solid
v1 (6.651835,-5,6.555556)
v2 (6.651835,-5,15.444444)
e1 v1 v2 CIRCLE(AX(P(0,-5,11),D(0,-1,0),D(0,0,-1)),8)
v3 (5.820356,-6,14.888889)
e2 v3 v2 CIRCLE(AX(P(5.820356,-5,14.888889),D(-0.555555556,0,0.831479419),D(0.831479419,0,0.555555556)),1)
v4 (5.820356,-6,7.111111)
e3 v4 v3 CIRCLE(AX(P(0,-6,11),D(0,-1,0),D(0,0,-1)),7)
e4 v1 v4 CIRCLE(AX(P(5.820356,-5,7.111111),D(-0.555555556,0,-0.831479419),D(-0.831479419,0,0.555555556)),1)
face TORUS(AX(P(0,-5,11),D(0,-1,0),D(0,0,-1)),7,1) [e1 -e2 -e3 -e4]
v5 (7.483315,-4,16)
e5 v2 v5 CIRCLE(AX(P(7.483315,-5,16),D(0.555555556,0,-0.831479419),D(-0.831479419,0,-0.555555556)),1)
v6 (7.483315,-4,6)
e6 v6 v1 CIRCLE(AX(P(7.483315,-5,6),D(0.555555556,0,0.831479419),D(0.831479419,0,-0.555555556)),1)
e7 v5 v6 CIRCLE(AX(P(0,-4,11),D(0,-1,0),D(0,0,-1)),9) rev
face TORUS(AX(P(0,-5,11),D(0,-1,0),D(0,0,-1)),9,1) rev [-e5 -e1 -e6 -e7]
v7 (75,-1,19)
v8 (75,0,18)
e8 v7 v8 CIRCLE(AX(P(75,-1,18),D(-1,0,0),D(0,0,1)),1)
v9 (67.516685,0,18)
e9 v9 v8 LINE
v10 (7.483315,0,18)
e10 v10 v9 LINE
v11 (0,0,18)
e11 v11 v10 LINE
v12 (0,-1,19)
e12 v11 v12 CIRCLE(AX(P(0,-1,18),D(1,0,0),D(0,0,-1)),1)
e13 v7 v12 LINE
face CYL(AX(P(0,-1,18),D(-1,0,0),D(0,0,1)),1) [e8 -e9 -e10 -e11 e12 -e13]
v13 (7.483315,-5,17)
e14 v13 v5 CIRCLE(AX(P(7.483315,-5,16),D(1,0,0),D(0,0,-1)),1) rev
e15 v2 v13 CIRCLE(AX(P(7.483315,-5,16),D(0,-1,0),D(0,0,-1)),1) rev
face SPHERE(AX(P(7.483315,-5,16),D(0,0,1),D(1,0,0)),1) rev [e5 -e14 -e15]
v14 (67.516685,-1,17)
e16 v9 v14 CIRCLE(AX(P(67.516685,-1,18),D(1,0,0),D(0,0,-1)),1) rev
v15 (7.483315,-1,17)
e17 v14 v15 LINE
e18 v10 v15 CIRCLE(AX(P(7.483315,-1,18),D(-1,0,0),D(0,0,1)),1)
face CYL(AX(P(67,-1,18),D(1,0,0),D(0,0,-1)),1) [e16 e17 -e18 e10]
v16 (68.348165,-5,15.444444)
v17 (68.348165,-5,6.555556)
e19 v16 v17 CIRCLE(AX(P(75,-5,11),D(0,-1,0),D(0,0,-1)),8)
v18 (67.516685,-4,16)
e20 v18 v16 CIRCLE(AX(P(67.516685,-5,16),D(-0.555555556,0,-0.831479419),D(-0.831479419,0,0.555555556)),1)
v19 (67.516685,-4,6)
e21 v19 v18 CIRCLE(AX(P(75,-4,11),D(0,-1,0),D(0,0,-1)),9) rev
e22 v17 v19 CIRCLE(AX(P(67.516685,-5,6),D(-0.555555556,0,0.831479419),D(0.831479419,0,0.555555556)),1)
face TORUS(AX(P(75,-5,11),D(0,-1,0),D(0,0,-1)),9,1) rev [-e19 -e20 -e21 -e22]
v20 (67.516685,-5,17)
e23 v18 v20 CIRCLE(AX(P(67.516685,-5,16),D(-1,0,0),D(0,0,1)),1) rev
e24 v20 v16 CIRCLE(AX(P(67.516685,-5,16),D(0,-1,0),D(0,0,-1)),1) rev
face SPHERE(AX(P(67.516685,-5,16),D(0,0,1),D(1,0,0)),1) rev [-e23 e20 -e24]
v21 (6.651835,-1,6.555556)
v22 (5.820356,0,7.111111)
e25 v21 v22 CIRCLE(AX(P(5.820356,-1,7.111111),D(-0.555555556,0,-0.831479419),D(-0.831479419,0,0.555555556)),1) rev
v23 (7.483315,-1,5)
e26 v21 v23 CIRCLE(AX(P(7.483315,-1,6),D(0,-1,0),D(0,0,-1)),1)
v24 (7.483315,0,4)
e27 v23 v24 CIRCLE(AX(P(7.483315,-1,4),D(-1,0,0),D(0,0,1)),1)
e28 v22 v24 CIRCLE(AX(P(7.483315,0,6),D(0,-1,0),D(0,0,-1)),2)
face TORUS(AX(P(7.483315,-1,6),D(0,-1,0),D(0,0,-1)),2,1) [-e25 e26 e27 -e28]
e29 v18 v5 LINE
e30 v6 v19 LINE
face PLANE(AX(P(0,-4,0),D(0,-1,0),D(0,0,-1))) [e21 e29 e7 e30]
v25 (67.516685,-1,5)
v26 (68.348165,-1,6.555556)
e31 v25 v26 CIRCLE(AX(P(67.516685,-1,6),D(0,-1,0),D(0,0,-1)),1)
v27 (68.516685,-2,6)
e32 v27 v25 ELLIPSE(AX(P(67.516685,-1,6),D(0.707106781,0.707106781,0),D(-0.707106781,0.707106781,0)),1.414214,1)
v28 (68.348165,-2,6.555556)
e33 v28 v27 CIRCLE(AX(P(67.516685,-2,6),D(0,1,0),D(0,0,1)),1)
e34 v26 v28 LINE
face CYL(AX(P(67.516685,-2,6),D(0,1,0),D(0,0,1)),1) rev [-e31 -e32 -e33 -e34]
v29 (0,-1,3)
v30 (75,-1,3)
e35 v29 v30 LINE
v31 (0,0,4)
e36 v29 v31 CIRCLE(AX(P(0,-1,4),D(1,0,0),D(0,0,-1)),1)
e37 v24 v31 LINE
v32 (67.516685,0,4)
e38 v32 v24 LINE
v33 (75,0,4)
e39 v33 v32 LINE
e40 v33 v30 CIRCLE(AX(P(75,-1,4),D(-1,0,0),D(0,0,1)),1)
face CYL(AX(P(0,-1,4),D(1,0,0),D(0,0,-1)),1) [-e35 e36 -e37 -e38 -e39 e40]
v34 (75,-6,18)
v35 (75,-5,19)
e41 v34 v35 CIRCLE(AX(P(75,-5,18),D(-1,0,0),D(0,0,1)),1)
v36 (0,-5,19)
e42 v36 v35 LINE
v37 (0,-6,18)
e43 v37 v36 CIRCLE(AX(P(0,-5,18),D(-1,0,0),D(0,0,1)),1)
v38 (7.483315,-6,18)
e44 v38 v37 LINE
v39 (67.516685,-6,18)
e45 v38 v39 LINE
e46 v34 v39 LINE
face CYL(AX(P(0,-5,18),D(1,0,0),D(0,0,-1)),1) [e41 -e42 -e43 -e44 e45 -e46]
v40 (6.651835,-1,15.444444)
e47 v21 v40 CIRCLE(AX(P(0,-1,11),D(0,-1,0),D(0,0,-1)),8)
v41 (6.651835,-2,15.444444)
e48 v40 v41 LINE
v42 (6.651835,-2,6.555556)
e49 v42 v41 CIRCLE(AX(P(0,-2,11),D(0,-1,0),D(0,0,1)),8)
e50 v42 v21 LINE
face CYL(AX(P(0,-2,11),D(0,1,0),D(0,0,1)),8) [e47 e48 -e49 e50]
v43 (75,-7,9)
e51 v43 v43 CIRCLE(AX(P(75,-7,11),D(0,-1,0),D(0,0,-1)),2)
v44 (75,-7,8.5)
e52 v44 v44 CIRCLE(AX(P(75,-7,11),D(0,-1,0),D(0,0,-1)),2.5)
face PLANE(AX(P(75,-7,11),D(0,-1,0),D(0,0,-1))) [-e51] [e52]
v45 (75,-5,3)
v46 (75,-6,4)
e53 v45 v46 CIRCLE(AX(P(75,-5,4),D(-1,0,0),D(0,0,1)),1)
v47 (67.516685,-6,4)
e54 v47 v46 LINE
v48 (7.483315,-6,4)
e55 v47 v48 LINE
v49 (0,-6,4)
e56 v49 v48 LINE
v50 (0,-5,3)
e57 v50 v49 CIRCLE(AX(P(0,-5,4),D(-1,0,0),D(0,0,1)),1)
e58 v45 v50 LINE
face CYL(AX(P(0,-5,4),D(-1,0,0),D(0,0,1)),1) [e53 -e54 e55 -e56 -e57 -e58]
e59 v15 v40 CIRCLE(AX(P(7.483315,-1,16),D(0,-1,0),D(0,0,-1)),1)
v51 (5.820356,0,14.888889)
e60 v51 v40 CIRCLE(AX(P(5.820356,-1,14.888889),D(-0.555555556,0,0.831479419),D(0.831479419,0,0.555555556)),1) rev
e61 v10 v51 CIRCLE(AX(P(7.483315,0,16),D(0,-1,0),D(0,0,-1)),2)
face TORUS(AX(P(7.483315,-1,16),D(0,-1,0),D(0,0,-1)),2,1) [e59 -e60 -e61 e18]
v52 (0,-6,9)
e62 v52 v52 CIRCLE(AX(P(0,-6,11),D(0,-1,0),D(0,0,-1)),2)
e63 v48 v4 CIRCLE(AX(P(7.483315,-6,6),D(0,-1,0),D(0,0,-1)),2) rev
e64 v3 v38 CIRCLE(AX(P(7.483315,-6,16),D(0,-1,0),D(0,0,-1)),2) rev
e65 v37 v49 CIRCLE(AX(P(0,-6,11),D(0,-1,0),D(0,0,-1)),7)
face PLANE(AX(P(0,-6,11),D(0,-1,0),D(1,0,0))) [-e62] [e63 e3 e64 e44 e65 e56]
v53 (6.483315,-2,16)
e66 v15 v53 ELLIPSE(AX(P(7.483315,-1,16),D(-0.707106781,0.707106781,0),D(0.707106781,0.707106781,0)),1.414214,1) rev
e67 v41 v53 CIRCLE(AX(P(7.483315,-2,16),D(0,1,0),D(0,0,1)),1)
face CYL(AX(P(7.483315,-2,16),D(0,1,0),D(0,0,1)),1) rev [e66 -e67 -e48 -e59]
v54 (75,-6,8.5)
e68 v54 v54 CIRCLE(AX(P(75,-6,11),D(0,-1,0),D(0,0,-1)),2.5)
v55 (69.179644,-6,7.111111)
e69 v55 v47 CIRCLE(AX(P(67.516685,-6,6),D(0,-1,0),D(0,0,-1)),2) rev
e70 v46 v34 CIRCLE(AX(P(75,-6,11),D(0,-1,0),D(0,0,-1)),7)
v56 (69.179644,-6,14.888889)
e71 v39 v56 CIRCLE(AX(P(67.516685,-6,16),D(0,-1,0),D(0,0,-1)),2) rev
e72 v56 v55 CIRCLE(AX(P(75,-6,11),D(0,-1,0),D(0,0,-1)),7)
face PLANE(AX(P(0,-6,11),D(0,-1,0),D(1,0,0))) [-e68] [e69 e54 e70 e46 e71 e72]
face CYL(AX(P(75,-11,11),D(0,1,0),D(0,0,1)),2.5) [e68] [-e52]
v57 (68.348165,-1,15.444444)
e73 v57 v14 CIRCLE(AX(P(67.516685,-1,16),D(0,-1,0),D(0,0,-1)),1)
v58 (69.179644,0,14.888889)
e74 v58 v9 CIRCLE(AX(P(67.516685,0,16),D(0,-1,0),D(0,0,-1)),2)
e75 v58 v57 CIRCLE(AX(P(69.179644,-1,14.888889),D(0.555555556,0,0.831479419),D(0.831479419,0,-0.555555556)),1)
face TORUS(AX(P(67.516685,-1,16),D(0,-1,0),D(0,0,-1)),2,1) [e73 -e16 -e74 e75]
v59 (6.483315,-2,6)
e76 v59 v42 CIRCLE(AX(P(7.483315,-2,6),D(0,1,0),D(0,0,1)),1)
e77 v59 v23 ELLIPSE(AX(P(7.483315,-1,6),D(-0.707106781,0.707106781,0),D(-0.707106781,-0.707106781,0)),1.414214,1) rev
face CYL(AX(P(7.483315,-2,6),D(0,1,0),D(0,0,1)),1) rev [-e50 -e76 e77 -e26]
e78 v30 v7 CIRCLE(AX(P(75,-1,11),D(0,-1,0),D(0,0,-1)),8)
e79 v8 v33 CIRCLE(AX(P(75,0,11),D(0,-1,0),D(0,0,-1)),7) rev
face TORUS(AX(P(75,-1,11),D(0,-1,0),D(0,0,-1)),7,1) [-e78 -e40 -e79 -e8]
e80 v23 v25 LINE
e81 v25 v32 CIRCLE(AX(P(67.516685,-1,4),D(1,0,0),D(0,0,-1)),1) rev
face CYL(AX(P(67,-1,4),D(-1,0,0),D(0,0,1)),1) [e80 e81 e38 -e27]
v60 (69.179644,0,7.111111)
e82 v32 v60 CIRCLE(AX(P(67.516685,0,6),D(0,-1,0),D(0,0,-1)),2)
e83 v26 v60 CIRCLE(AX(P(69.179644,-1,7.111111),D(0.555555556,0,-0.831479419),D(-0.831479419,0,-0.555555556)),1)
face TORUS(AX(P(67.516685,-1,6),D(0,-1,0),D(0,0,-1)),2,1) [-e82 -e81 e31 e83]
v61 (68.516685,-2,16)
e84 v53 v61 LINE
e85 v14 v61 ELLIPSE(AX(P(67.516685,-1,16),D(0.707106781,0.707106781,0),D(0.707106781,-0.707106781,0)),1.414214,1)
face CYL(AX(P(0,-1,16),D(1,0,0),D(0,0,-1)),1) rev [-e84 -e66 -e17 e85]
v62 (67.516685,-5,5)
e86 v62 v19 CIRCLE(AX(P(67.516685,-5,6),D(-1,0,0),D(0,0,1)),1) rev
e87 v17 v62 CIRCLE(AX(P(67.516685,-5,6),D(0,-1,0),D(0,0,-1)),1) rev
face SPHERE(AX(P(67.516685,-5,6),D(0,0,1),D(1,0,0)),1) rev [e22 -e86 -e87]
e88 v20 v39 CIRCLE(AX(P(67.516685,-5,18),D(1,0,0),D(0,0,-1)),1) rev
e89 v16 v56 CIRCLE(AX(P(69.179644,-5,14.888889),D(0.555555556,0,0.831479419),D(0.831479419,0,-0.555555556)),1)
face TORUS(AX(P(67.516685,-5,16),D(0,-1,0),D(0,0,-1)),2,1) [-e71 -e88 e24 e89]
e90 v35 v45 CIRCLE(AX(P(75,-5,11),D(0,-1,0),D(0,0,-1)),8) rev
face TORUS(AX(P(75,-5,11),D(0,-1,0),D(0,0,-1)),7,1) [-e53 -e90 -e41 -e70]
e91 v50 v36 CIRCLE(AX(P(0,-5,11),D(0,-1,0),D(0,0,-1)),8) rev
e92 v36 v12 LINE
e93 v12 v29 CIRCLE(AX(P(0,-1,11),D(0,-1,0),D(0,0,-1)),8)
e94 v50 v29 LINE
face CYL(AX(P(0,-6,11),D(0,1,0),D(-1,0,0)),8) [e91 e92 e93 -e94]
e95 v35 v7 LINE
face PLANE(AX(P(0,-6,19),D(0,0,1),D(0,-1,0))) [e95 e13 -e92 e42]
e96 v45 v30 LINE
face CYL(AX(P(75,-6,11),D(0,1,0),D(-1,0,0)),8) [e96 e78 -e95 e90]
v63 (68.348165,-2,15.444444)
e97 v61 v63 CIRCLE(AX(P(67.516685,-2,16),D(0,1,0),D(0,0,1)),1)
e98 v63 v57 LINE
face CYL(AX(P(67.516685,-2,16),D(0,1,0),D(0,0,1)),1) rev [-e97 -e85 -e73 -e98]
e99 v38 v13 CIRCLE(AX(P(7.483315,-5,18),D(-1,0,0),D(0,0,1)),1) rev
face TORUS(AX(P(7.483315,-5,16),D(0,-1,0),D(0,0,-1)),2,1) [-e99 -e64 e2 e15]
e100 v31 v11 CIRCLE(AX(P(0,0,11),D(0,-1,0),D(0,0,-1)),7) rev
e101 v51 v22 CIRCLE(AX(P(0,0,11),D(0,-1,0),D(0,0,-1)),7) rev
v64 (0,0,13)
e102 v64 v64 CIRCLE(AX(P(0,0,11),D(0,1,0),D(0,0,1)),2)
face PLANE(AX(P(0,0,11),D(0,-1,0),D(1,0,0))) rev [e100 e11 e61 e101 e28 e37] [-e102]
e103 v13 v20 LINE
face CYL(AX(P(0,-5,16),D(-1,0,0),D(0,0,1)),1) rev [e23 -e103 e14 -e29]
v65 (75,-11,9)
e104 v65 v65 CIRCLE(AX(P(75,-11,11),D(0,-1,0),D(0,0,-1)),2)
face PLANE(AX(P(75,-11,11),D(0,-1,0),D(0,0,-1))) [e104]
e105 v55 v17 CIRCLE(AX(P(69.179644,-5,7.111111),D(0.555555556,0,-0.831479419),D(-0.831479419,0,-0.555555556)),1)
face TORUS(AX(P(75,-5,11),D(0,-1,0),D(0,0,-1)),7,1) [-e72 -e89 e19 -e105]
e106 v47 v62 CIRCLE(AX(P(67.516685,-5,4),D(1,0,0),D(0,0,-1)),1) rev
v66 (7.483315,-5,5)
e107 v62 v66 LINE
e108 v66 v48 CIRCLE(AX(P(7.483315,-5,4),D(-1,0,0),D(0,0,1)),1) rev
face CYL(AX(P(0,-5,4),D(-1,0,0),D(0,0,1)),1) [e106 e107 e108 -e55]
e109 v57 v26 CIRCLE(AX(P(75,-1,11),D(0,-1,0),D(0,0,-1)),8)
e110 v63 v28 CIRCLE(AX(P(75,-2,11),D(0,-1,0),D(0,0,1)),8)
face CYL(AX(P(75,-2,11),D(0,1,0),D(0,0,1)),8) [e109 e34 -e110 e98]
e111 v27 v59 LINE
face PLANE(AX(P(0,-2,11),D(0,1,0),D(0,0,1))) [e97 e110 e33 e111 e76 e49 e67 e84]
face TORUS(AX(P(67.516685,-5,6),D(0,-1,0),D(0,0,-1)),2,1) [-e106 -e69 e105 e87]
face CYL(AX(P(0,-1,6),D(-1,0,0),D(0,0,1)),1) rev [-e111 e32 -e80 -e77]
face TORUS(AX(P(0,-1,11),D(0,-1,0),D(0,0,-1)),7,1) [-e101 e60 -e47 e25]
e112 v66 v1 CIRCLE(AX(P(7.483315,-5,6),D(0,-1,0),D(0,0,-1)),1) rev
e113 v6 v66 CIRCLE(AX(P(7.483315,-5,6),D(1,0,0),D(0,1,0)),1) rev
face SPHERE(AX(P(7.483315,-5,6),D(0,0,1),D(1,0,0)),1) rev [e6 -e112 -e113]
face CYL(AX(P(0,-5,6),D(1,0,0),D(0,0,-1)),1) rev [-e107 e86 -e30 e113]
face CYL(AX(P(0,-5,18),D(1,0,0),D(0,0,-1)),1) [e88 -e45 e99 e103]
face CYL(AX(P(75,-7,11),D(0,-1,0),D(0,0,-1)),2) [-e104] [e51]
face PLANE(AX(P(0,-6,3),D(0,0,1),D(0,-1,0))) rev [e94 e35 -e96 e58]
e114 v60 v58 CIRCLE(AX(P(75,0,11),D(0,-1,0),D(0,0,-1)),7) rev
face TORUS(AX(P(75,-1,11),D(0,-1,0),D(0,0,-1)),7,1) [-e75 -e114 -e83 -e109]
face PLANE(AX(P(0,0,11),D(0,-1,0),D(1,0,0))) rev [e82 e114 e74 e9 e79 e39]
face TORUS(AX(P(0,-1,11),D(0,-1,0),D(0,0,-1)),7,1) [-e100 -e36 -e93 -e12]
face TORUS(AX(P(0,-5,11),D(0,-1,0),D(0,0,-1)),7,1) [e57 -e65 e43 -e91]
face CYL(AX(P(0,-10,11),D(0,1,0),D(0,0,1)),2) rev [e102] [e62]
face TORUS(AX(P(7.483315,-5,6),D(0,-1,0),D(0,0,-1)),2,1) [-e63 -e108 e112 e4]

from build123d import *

# Parameters (mm, degrees)
BOSS_EXTRUDE1_DEPTH   = 6
BODY_MOVE_COPY1_ANGLE = 90
SKETCH11_R            = 2.5
BOSS_EXTRUDE7_DEPTH   = 5
CUT_EXTRUDE6_START    = -4
SKETCH12_R            = 2.5
SKETCH12_R_2          = 2
CUT_EXTRUDE6_DEPTH    = 4
SKETCH9_R             = 2
CUT_EXTRUDE7_DEPTH    = 10
BODY_MOVE_COPY2_ANGLE = 180
CUT_EXTRUDE8_START    = -2
CUT_EXTRUDE8_DEPTH    = 2
FILLET1_R             = 1
CUT_EXTRUDE9_DEPTH    = 2
FILLET2_R             = 1


with BuildPart() as part:
    # Sketch1 → Boss-Extrude1 (new body)
    with BuildSketch(Plane.XY):
        with BuildLine():
            Line((0, 8), (75, 8))
            ThreePointArc((75, 8), (83, 0), (75, -8))
            Line((75, -8), (0, -8))
            ThreePointArc((0, -8), (-8, 0), (0, 8))
        make_face()
    extrude(amount=BOSS_EXTRUDE1_DEPTH)


with BuildPart() as part_1:
    # Body-Move/Copy1: moved
    add(part.part.rotate(Axis((0, 0, 11), (-1, 0, 0)), BODY_MOVE_COPY1_ANGLE))

    # Sketch11 → Boss-Extrude7 (add)
    with BuildSketch(Plane(origin=(0, -5, 0), x_dir=(1, 0, 0), z_dir=(0, 1, 0))):
        with Locations(Location((75, -11, 0), (0, 0, 270))):
            Circle(SKETCH11_R)
    extrude(amount=BOSS_EXTRUDE7_DEPTH)

    # Sketch12 → Cut-Extrude6 (cut)
    with BuildSketch(Plane(origin=(0, 0, 0), x_dir=(1, 0, 0), z_dir=(0, 1, 0)).offset(CUT_EXTRUDE6_START)):
        with Locations(Location((75, -11, 0), (0, 0, 270))):
            Circle(SKETCH12_R)
        with Locations(Location((75, -11, 0), (0, 0, 270))):
            Circle(SKETCH12_R_2, mode=Mode.SUBTRACT)
    extrude(amount=CUT_EXTRUDE6_DEPTH, mode=Mode.SUBTRACT)

    # Sketch9 → Cut-Extrude7 (cut)
    with BuildSketch(Plane.XZ.offset(11)):
        with Locations(Location((0, 11, 0), (0, 0, 270))):
            Circle(SKETCH9_R)
    extrude(amount=-CUT_EXTRUDE7_DEPTH, mode=Mode.SUBTRACT)


with BuildPart() as part_2:
    # Body-Move/Copy2: moved
    add(part_1.part.rotate(Axis((0, -5.5, 11), (1, 0, 0)), BODY_MOVE_COPY2_ANGLE))

    # Sketch13 → Cut-Extrude8 (cut)
    with BuildSketch(Plane.XZ.offset(6).offset(CUT_EXTRUDE8_START)):
        with BuildLine():
            Line((63, 5), (69.708497378, 5))
            ThreePointArc((69.708497378, 5), (67, 11), (69.708497378, 17))
            Line((69.708497378, 17), (63, 17))
            Line((63, 17), (12, 17))
            Line((12, 17), (5.291502622, 17))
            ThreePointArc((5.291502622, 17), (8, 11), (5.291502622, 5))
            Line((5.291502622, 5), (12, 5))
            Line((12, 5), (63, 5))
        make_face()
    extrude(amount=CUT_EXTRUDE8_DEPTH, mode=Mode.SUBTRACT)

    # Fillet1
    fillet1_edges = [part_2.edges().sort_by_distance(p)[0] for p in [
        (37.5, -6, 3),
        (83, -6, 11),
        (8, -6, 11),
        (5.291502622, -5, 5),
        (37.5, -6, 17),
        (5.291502622, -5, 17),
        (67, -6, 11),
        (69.708497378, -5, 17),
        (37.5, -6, 5),
        (69.708497378, -5, 5),
        (8, -4, 11),
        (37.5, -4, 17),
        (67, -4, 11),
        (37.5, -4, 5),
        (37.5, -6, 19),
        (-8, -6, 11),
    ]]
    fillet(fillet1_edges, radius=FILLET1_R - 0.0001)  # a hair under: the kernel refuses the full size

    # Sketch14 → Cut-Extrude9 (cut)
    with BuildSketch(Plane(origin=(0, 0, 0), x_dir=(1, 0, 0), z_dir=(0, 1, 0))):
        with BuildLine():
            Line((67, -5), (69.708497378, -5))
            ThreePointArc((69.708497378, -5), (67, -11), (69.708497378, -17))
            Line((69.708497378, -17), (67, -17))
            Line((67, -17), (5.291502622, -17))
            ThreePointArc((5.291502622, -17), (8, -11), (5.291502622, -5))
            Line((5.291502622, -5), (67, -5))
        make_face()
    extrude(amount=-CUT_EXTRUDE9_DEPTH, mode=Mode.SUBTRACT)

    # Fillet2
    fillet2_edges = [part_2.edges().sort_by_distance(p)[0] for p in [
        (37.5, -2, 5),
        (5.291502622, -1, 5),
        (69.708497378, -1, 5),
        (37.5, -2, 17),
        (69.708497378, -1, 17),
        (5.291502622, -1, 17),
        (37.5, 0, 5),
        (8, 0, 11),
        (37.5, 0, 17),
        (67, 0, 11),
        (83, 0, 11),
        (37.5, 0, 3),
        (-8, 0, 11),
        (37.5, 0, 19),
    ]]
    fillet(fillet2_edges, radius=FILLET2_R - 0.0001)  # a hair under: the kernel refuses the full size


solid = part_2.part
